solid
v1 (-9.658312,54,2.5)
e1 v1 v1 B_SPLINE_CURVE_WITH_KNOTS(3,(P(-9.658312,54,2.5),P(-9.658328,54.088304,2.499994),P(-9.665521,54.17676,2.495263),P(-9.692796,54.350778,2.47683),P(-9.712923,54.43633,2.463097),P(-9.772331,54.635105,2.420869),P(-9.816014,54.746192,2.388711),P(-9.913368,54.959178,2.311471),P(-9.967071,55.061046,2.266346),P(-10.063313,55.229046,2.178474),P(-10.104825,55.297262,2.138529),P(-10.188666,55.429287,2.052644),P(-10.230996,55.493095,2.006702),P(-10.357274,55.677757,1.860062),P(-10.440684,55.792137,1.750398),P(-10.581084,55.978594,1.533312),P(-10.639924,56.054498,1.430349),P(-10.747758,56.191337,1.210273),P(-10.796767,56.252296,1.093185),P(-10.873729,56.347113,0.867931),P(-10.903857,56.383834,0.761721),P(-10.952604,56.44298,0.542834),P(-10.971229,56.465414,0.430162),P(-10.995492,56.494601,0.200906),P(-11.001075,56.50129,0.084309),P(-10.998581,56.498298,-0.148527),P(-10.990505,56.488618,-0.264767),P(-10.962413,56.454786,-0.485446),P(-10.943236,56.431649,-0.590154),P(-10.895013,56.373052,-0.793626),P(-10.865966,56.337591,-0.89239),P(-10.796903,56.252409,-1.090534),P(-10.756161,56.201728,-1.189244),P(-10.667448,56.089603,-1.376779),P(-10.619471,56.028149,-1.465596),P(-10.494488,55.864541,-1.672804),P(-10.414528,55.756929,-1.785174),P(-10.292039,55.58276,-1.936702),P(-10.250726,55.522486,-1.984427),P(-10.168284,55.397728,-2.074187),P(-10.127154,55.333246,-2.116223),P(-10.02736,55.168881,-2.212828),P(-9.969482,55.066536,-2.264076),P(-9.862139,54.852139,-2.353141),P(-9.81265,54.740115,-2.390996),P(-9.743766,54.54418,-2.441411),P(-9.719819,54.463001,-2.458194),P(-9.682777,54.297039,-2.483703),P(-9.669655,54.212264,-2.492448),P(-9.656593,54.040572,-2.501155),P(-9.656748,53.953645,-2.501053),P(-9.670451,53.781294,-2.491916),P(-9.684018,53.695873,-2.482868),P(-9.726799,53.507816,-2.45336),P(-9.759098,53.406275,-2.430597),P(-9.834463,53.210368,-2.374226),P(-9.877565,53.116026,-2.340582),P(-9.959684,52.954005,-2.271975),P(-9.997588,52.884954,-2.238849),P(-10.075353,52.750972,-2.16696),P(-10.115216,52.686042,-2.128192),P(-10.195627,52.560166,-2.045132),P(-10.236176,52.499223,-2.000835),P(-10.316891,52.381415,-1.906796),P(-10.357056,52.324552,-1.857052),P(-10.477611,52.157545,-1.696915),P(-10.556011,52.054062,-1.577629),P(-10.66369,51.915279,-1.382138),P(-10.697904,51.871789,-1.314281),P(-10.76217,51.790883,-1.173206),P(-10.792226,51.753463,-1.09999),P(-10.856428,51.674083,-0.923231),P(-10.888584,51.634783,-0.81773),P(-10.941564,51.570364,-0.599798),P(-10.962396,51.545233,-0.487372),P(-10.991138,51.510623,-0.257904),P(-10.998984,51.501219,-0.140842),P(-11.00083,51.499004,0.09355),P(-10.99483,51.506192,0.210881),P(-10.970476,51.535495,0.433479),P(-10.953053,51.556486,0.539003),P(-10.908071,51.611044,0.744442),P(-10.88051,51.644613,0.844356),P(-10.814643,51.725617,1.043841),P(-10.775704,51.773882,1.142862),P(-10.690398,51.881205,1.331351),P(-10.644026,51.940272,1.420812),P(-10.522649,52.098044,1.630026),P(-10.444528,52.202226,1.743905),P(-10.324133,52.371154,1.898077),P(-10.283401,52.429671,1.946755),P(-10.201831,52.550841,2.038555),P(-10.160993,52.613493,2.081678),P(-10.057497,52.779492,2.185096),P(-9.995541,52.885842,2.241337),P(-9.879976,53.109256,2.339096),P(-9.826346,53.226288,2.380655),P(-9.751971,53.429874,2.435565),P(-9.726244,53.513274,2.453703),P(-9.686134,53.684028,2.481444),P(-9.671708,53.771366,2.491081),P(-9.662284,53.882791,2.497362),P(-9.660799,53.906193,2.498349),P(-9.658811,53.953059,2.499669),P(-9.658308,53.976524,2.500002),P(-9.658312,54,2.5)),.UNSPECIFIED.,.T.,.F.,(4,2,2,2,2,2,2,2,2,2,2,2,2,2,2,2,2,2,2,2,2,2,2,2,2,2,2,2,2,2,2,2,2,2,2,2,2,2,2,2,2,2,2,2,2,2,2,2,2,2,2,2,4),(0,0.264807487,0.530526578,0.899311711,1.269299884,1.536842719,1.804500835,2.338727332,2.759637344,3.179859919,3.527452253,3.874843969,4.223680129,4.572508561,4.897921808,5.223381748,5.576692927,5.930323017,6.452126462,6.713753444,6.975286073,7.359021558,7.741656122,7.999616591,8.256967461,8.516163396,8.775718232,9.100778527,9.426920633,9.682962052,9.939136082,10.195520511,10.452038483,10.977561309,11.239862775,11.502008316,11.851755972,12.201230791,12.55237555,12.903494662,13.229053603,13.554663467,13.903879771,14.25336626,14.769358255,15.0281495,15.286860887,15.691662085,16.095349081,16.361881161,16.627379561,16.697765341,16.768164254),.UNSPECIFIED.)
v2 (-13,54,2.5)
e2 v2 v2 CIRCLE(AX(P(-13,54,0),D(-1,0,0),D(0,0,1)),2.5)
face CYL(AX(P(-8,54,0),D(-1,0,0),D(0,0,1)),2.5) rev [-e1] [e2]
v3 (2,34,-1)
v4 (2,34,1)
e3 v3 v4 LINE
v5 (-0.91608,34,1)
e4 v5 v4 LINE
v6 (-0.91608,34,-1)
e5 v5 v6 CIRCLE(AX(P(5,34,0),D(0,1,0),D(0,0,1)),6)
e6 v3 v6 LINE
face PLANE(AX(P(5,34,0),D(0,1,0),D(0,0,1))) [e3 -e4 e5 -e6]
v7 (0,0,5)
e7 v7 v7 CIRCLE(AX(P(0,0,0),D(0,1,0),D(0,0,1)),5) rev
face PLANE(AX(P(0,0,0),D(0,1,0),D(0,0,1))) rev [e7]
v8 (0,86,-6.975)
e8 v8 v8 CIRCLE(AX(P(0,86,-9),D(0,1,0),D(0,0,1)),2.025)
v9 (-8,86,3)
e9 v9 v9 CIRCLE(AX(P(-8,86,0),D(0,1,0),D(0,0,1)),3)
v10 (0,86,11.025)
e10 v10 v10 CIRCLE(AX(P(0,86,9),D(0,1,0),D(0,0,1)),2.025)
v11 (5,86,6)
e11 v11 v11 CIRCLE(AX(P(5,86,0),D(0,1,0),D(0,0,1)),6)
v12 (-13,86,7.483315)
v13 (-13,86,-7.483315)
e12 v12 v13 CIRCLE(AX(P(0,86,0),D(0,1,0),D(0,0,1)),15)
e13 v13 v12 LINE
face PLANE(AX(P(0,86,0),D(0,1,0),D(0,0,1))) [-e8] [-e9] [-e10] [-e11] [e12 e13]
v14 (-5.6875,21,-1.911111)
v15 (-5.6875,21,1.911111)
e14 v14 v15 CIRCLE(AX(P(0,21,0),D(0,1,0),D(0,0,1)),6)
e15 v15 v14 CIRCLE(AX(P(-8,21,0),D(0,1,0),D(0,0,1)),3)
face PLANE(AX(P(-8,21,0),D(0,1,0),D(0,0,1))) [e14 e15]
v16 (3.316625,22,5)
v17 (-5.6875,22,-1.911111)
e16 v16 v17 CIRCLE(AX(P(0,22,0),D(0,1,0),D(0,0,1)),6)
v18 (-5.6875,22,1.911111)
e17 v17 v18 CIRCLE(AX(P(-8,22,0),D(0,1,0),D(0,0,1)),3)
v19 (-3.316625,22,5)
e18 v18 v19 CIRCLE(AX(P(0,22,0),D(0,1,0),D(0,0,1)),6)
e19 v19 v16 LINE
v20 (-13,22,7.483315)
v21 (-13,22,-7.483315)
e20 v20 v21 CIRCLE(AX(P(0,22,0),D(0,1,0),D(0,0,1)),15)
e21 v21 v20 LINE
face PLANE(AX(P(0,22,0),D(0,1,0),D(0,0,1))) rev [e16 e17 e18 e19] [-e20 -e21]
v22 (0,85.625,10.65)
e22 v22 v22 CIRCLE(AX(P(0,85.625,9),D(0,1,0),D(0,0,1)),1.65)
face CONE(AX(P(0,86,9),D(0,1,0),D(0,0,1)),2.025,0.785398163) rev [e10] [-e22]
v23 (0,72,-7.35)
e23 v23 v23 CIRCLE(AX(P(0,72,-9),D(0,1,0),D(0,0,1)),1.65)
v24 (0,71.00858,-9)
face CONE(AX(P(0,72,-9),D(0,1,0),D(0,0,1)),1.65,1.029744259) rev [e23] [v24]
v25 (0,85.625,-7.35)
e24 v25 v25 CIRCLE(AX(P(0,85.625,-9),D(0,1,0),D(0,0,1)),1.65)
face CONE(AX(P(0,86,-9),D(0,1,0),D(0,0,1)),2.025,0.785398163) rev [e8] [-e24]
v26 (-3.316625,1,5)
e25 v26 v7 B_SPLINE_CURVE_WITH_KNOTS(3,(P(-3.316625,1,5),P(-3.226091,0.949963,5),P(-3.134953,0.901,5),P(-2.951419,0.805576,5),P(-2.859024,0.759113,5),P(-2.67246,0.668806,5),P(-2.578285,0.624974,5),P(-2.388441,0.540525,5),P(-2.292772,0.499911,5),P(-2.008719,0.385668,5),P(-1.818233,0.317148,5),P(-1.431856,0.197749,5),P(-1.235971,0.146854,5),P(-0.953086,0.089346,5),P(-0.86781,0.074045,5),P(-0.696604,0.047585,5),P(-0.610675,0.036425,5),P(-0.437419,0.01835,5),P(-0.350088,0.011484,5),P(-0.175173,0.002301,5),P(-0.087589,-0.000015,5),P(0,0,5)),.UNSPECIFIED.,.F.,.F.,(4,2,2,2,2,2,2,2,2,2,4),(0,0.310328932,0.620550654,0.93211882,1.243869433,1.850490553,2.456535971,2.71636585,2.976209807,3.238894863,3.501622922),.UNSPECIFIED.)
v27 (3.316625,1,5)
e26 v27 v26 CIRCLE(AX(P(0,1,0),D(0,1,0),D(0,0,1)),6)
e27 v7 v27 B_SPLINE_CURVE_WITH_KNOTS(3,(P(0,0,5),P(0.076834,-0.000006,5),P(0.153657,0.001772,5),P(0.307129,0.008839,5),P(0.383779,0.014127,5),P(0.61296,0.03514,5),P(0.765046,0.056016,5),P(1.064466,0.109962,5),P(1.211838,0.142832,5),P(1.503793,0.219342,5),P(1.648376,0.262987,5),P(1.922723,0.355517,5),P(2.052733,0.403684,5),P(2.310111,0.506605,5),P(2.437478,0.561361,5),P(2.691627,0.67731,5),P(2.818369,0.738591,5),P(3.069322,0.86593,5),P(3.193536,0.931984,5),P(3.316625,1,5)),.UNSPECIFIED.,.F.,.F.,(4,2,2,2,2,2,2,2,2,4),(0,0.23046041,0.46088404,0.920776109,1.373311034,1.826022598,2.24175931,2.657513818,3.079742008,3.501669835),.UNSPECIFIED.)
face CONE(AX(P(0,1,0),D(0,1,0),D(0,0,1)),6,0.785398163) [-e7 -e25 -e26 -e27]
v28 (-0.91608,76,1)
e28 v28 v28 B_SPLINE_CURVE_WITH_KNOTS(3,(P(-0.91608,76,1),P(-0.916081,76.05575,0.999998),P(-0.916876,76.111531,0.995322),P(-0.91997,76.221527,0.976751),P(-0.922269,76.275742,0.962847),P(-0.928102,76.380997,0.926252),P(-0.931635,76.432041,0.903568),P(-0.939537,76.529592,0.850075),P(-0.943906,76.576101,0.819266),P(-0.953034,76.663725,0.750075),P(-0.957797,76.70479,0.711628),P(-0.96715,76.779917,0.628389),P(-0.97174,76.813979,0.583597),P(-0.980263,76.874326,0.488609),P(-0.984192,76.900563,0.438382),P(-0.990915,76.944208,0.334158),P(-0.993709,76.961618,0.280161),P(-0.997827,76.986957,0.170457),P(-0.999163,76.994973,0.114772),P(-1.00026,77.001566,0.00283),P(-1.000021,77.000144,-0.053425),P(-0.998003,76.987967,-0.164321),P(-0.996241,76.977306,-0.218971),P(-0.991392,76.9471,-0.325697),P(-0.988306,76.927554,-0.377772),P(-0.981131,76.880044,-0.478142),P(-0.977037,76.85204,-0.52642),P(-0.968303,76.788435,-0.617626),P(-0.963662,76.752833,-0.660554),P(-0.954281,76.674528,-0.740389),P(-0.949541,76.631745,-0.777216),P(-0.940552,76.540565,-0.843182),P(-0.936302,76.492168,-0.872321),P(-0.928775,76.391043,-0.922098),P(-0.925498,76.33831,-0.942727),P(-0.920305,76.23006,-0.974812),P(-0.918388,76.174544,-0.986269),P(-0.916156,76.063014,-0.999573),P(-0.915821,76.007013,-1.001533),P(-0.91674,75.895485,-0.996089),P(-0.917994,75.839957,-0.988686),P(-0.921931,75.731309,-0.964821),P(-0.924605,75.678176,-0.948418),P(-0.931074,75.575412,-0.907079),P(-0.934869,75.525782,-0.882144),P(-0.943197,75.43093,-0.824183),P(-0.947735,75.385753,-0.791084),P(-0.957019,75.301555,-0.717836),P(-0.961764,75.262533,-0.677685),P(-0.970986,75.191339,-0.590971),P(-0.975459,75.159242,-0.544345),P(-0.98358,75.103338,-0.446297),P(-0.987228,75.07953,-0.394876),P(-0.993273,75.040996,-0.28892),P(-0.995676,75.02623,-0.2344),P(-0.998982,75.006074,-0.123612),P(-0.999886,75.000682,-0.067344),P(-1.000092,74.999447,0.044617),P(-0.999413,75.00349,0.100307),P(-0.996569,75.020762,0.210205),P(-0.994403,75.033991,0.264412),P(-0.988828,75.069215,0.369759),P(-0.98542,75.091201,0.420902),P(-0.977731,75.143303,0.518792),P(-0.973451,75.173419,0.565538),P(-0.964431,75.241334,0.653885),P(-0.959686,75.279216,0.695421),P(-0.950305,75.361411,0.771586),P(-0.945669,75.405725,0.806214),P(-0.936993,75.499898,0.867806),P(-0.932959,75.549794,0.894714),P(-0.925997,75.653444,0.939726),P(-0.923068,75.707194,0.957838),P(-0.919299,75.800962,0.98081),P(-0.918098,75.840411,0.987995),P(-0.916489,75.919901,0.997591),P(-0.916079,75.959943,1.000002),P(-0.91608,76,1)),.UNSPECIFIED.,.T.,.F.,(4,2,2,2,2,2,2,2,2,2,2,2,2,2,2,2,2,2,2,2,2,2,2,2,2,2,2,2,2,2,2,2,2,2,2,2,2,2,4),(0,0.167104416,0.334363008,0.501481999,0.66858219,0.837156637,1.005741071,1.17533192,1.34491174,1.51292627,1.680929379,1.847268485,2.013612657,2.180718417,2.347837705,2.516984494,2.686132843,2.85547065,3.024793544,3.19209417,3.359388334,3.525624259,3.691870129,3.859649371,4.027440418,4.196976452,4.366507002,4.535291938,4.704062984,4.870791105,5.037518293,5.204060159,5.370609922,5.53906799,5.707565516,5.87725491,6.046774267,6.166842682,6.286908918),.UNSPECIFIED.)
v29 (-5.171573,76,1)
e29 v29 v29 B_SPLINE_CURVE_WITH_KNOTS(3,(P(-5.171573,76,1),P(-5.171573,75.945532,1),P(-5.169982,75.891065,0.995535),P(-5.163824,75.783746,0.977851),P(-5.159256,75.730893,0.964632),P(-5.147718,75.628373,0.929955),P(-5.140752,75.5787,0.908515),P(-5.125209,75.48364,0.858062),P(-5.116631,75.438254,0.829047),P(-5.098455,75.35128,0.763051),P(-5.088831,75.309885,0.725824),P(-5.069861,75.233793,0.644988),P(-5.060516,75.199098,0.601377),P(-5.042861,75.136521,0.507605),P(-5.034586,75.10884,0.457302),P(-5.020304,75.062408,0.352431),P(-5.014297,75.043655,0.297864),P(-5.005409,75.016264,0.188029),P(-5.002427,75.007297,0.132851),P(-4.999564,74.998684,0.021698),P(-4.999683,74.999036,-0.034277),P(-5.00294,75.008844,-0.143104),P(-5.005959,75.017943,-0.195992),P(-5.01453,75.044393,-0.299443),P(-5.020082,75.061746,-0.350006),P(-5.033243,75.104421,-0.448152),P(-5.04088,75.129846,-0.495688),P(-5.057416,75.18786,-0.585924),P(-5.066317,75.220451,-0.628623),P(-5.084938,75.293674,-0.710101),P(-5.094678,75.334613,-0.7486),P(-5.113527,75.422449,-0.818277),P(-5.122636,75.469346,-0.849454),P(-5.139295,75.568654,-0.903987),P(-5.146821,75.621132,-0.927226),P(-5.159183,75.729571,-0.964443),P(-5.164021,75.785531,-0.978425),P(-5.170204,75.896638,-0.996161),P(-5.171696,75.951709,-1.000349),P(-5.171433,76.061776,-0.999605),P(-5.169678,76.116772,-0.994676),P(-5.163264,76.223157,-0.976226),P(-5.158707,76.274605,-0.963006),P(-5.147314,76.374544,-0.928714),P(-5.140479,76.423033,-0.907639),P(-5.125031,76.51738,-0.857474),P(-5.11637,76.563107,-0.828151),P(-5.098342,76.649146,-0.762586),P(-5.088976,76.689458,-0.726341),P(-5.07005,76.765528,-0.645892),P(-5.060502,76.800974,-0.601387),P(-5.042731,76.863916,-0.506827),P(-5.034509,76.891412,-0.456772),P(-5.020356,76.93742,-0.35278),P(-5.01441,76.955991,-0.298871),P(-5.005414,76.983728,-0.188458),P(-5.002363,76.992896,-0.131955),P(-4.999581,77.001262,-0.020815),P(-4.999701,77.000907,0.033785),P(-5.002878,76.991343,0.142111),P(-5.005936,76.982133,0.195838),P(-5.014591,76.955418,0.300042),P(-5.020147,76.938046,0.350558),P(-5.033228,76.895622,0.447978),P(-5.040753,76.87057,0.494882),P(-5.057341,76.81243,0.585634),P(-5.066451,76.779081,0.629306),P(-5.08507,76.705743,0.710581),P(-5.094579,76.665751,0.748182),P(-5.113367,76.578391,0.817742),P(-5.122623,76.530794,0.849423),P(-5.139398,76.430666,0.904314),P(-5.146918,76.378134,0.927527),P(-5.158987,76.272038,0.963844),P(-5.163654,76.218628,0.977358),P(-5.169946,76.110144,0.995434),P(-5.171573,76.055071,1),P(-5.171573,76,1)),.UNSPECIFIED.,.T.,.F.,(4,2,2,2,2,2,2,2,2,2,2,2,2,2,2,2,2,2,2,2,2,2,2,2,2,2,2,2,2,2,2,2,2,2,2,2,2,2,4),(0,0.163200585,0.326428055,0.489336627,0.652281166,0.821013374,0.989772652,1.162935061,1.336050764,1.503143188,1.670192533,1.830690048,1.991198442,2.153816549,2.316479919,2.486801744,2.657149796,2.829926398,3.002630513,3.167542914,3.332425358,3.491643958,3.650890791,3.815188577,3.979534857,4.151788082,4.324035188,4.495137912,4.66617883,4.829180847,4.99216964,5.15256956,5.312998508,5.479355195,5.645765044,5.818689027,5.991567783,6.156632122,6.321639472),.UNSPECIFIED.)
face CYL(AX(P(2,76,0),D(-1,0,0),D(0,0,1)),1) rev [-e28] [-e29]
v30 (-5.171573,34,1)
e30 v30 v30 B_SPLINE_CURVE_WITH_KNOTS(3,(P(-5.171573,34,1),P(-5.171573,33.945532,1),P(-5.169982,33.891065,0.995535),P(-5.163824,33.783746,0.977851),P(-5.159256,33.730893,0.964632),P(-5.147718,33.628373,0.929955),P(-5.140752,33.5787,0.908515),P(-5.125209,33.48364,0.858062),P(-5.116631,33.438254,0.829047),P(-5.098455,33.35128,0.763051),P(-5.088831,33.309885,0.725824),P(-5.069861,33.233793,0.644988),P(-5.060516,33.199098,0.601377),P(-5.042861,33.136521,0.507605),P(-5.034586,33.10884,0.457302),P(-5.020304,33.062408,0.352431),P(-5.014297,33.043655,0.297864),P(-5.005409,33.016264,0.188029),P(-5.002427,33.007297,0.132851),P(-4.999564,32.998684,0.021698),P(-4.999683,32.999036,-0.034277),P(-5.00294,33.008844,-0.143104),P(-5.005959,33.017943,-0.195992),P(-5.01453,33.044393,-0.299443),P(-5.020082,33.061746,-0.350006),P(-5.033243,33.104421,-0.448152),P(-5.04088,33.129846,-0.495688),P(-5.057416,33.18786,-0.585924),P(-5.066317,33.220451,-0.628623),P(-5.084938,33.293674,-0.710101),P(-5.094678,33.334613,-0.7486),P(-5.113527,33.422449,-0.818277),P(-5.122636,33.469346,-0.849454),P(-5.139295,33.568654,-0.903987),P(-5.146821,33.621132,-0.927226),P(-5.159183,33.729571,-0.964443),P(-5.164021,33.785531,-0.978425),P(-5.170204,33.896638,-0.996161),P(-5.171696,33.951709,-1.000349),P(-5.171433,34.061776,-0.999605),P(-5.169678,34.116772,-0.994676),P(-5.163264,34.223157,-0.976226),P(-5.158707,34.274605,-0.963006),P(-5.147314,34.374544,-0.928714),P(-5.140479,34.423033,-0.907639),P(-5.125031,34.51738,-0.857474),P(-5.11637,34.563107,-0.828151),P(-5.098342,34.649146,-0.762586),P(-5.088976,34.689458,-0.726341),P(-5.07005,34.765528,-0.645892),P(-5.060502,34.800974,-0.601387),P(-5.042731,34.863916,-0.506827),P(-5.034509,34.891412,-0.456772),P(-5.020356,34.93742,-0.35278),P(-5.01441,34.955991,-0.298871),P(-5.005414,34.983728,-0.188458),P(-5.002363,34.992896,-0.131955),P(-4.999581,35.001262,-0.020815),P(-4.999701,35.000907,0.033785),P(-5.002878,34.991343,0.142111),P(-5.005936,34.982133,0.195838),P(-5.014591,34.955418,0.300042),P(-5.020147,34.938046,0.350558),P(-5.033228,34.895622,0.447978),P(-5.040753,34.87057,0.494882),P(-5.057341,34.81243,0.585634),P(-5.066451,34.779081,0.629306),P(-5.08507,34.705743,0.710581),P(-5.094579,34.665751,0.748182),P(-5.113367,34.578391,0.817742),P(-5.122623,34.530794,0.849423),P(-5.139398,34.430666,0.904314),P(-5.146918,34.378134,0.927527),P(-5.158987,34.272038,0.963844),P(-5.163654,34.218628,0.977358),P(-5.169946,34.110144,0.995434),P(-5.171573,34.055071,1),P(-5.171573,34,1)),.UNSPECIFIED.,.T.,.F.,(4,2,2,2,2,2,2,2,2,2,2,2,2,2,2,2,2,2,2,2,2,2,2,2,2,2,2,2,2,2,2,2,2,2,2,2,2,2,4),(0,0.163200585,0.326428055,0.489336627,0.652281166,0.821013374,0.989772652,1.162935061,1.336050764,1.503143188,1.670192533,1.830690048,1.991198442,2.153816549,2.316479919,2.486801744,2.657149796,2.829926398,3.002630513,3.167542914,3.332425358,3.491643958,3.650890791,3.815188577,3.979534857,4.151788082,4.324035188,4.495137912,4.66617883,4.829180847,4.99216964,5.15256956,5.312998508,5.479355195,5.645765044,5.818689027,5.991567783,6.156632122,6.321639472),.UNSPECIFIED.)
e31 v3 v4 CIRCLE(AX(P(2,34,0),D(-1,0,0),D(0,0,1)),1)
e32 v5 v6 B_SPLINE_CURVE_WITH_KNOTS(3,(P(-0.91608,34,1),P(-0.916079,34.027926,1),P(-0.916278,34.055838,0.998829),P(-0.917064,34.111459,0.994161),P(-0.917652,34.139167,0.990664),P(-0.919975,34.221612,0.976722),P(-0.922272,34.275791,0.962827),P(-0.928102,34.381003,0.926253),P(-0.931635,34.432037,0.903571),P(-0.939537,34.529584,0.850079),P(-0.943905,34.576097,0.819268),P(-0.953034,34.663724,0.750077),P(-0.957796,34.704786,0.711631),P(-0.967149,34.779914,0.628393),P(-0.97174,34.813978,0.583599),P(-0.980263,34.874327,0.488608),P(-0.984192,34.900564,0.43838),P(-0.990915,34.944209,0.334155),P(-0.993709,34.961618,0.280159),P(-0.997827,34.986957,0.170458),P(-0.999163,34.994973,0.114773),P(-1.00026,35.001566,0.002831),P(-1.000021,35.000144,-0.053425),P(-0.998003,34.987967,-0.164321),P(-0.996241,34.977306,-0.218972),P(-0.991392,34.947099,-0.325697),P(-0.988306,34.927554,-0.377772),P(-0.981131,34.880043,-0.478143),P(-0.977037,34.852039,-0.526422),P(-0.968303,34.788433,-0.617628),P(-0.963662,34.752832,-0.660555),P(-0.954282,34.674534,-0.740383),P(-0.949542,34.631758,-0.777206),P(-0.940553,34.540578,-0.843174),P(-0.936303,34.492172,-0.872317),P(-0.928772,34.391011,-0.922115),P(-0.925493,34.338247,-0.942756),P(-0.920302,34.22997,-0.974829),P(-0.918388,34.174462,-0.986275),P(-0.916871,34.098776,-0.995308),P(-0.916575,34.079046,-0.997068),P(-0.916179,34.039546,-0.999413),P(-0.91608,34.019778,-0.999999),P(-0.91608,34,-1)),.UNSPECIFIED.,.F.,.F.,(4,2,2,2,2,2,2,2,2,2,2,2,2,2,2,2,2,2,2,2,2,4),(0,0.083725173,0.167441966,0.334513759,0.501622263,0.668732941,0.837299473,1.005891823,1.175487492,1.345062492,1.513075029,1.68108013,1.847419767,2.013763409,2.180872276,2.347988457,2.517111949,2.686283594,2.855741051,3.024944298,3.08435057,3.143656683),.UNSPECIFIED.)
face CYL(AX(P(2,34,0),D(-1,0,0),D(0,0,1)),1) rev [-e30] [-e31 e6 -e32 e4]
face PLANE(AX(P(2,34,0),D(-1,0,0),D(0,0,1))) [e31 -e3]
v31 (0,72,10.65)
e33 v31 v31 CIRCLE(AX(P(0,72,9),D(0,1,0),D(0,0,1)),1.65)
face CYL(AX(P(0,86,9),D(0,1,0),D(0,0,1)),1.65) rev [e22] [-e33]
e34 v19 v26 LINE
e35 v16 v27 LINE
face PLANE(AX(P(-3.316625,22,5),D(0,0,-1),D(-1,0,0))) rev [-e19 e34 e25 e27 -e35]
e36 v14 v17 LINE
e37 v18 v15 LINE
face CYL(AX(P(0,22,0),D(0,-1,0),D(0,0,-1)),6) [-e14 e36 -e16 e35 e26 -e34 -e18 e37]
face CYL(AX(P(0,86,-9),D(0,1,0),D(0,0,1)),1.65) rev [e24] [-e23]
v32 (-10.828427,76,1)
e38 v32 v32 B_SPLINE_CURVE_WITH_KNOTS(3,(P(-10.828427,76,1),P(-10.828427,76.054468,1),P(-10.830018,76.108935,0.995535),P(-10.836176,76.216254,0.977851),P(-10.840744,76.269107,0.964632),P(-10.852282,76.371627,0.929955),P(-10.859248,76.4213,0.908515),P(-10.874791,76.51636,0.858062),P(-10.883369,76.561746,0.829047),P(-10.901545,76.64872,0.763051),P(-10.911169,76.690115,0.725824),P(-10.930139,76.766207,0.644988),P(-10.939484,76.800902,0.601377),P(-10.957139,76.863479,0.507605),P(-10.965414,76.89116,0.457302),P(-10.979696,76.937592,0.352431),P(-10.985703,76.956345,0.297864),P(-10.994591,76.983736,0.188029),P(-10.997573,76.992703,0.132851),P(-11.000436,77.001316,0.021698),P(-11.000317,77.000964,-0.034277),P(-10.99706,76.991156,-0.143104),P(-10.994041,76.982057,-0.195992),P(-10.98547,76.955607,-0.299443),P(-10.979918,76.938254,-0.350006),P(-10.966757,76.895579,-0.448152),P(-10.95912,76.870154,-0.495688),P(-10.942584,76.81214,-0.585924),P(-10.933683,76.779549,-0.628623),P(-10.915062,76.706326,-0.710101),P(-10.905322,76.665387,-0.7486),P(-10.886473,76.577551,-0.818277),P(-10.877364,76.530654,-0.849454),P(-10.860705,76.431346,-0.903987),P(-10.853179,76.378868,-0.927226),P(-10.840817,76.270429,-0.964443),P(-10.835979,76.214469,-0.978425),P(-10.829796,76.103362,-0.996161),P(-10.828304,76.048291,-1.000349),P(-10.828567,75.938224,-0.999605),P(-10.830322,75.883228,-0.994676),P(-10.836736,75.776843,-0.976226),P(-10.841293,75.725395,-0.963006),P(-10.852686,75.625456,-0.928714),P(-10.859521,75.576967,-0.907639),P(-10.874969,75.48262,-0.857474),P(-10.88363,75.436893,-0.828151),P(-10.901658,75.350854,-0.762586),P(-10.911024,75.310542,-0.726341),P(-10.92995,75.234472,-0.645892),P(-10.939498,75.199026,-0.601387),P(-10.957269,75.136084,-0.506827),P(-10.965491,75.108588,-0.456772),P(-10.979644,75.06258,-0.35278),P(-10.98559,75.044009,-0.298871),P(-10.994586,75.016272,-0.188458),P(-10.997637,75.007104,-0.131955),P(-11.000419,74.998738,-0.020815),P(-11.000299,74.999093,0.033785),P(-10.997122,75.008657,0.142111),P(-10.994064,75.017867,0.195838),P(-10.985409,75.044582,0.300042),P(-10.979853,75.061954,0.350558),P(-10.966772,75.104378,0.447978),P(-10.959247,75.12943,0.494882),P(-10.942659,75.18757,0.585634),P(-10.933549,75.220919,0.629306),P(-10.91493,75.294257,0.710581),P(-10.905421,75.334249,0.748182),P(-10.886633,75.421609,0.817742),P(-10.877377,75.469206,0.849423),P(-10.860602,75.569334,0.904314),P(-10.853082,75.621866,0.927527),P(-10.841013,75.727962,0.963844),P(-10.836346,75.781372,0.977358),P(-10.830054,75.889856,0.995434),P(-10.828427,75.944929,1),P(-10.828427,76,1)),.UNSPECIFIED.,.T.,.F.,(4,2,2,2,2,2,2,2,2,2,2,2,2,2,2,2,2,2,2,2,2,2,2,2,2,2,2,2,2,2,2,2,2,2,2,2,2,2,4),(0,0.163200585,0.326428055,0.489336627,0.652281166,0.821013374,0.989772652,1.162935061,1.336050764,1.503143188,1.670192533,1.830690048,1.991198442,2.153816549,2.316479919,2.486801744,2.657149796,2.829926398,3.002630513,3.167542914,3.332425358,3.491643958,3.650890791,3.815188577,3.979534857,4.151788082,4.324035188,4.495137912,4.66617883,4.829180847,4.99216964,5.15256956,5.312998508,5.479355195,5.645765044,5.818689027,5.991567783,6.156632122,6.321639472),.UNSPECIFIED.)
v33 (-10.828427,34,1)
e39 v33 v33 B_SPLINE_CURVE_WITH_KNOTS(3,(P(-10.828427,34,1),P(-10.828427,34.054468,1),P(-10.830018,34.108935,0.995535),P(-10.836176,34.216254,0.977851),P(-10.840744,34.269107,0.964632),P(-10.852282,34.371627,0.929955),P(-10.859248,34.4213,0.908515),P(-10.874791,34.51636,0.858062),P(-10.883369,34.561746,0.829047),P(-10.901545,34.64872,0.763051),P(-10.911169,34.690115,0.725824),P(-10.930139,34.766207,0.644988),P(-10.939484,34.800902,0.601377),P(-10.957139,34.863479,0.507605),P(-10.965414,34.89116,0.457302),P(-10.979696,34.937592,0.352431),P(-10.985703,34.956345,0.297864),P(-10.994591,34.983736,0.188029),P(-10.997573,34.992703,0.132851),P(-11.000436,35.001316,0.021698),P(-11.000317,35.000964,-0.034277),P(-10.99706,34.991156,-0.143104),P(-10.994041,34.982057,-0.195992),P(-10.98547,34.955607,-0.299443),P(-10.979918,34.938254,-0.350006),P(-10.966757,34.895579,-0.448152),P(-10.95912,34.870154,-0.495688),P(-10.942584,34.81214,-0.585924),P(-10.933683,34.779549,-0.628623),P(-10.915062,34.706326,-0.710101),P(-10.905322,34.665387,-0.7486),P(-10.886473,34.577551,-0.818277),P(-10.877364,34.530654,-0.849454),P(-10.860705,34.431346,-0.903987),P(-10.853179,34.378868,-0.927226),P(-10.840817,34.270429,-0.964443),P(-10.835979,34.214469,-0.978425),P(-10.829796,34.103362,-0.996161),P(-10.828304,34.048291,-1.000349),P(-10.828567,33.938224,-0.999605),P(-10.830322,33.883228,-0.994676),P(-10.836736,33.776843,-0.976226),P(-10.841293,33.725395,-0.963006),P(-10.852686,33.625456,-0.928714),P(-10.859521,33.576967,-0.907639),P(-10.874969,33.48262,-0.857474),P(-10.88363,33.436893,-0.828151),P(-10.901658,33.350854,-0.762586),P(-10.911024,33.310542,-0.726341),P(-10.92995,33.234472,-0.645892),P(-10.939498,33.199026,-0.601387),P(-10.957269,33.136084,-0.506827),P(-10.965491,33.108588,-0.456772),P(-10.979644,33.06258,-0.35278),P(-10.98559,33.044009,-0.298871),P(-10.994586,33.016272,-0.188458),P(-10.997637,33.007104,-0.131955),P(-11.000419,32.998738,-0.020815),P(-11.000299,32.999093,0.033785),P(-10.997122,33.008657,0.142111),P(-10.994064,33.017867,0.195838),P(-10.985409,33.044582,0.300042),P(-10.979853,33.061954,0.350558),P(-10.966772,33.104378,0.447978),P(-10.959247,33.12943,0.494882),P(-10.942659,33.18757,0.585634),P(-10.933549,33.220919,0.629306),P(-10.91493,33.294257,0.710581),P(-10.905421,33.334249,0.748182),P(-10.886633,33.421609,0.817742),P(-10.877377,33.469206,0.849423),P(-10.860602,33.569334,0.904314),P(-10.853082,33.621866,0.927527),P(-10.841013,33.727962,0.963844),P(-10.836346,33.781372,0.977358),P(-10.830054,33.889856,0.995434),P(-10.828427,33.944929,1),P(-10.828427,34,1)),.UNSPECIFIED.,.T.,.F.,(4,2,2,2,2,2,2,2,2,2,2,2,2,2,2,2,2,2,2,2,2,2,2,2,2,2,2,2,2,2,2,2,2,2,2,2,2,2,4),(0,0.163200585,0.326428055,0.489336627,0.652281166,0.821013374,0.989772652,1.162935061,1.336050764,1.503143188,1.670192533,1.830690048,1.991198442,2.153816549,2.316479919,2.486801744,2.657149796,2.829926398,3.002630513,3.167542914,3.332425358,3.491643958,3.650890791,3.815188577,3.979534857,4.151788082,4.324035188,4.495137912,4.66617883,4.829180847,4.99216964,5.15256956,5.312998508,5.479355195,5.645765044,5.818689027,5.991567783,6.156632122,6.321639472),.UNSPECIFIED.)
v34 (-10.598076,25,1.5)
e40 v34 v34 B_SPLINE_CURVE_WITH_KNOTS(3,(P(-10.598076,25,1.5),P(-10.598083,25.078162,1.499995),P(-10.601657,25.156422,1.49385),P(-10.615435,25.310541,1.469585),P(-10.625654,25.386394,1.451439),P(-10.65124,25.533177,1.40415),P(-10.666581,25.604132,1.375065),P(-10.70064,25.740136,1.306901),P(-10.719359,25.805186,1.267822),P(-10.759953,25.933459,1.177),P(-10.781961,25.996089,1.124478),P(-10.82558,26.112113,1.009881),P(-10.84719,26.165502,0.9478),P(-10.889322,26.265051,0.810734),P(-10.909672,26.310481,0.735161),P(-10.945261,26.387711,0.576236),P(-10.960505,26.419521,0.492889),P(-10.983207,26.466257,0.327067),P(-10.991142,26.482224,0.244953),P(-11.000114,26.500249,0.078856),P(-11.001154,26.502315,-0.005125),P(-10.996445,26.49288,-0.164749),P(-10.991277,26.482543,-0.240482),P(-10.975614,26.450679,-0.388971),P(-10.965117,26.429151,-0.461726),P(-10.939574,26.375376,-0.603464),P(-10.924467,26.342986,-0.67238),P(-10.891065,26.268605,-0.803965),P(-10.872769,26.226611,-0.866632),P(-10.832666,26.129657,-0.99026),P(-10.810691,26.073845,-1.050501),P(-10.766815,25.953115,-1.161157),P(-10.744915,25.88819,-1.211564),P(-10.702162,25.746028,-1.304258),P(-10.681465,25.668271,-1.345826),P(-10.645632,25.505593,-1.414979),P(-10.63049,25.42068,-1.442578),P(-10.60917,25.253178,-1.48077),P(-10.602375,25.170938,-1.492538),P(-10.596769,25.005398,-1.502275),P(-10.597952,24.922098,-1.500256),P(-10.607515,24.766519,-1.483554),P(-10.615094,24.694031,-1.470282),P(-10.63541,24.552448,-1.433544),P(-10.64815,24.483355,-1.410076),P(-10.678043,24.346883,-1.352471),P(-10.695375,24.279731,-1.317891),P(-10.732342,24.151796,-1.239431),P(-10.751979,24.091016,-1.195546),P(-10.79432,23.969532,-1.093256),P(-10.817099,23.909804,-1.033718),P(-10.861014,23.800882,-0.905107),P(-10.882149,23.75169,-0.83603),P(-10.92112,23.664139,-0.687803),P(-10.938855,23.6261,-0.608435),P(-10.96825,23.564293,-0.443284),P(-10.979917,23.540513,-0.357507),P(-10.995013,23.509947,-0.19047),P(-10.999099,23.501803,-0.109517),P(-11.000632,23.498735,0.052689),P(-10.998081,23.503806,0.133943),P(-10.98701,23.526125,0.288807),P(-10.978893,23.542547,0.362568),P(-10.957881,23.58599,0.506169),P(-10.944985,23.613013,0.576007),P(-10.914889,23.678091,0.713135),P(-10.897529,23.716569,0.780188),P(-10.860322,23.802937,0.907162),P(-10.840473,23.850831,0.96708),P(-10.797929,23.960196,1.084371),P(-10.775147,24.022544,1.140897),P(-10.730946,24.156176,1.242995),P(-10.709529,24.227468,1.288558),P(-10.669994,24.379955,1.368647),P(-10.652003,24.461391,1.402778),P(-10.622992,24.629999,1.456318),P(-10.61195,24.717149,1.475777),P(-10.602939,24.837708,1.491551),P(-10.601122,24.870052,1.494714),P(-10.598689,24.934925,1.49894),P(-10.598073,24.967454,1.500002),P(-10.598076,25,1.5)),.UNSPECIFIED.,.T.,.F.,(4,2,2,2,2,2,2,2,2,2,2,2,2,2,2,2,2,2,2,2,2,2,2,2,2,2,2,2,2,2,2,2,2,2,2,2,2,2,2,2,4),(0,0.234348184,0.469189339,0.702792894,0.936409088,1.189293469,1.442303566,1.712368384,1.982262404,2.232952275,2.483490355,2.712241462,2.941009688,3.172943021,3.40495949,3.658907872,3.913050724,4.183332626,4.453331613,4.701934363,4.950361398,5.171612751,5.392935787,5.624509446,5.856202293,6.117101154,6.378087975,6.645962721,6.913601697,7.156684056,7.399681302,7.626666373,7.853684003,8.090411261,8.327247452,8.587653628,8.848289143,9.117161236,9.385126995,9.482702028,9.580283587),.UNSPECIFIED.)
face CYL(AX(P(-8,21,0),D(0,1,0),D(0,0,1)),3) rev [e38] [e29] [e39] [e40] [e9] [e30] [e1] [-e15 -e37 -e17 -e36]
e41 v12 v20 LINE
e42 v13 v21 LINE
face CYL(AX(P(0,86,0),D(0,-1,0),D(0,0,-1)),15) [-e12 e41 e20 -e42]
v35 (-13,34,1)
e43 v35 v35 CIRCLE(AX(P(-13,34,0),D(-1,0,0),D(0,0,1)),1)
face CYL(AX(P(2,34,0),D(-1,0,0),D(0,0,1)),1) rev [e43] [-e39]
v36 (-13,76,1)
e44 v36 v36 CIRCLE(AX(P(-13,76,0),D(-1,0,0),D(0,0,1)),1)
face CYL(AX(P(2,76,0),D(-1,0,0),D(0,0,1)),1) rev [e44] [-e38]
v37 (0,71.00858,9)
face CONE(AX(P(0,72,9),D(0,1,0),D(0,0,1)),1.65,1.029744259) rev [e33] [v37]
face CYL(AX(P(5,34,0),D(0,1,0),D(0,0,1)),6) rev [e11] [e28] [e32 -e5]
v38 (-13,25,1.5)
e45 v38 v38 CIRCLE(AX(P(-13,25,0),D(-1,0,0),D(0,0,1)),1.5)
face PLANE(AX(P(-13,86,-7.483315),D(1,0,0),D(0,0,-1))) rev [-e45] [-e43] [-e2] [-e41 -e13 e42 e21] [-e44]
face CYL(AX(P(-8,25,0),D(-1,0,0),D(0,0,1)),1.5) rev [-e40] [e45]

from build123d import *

# Parameters (mm, degrees)
BOSS_EXTRUDE1_DEPTH         = 22
BOSS_EXTRUDE2_DEPTH         = 64
SKETCH3_R                   = 3
CUT_EXTRUDE1_DEPTH          = 65
SKETCH4_R                   = 6
CUT_EXTRUDE2_DEPTH          = 52
M4_TAPPED_HOLE1_D           = 3.3
M4_TAPPED_HOLE1_DEPTH       = 14
M4_TAPPED_HOLE1_CSINK_D     = 4.05
M4_TAPPED_HOLE1_CSINK_ANGLE = 90
M4_TAPPED_HOLE1_TIP         = 0.991420021
SKETCH7_R                   = 2.5
SKETCH7_R_2                 = 1.5
CUT_EXTRUDE3_DEPTH          = 5
SKETCH8_R                   = 1
CUT_EXTRUDE4_DEPTH          = 15
CHAMFER1_SIZE               = 1


with BuildPart() as part:
    # Sketch1 → Boss-Extrude1 (new body)
    with BuildSketch(Plane(origin=(0, 0, 0), x_dir=(1, 0, 0), z_dir=(0, 1, 0))):
        with BuildLine():
            Line((-3.31662479, -5), (3.31662479, -5))
            ThreePointArc((3.31662479, -5), (0, 6), (-3.31662479, -5))
        make_face()
    extrude(amount=BOSS_EXTRUDE1_DEPTH)

    # Sketch2 → Boss-Extrude2 (add)
    with BuildSketch(Plane(origin=(0, 22, 0), x_dir=(1, 0, 0), z_dir=(0, 1, 0))):
        with BuildLine():
            Line((-13, 7.483314774), (-13, -7.483314774))
            ThreePointArc((-13, -7.483314774), (15, 0), (-13, 7.483314774))
        make_face()
    extrude(amount=BOSS_EXTRUDE2_DEPTH)

    # Sketch3 → Cut-Extrude1 (cut)
    with BuildSketch(Plane(origin=(0, 86, 0), x_dir=(1, 0, 0), z_dir=(0, 1, 0))):
        with Locations(Location((-8, 0, 0), (0, 0, 270))):
            Circle(SKETCH3_R)
    extrude(amount=-CUT_EXTRUDE1_DEPTH, mode=Mode.SUBTRACT)

    # Sketch4 → Cut-Extrude2 (cut)
    with BuildSketch(Plane(origin=(0, 86, 0), x_dir=(1, 0, 0), z_dir=(0, 1, 0))):
        with Locations(Location((5, 0, 0), (0, 0, 270))):
            Circle(SKETCH4_R)
    extrude(amount=-CUT_EXTRUDE2_DEPTH, mode=Mode.SUBTRACT)

    # M4 Tapped Hole1
    with Locations(Plane(origin=(0, 86, 0), x_dir=(1, 0, 0), z_dir=(0, 1, 0))):
        with Locations((0, 9), (0, -9)):
            CounterSinkHole(M4_TAPPED_HOLE1_D / 2, M4_TAPPED_HOLE1_CSINK_D / 2, depth=M4_TAPPED_HOLE1_DEPTH, counter_sink_angle=M4_TAPPED_HOLE1_CSINK_ANGLE)
            with Locations((0, 0, -(M4_TAPPED_HOLE1_DEPTH + M4_TAPPED_HOLE1_TIP / 2))):  # 118° drill point
                Cone(0, M4_TAPPED_HOLE1_D / 2, M4_TAPPED_HOLE1_TIP, mode=Mode.SUBTRACT)

    # Sketch7 → Cut-Extrude3 (cut)
    with BuildSketch(Plane.ZY.offset(13)):
        with Locations((0, 54)):
            Circle(SKETCH7_R)
        with Locations((0, 25)):
            Circle(SKETCH7_R_2)
    extrude(amount=-CUT_EXTRUDE3_DEPTH, mode=Mode.SUBTRACT)

    # Sketch8 → Cut-Extrude4 (cut)
    with BuildSketch(Plane.ZY.offset(13)):
        with Locations((0, 76)):
            Circle(SKETCH8_R)
        with Locations((0, 34)):
            Circle(SKETCH8_R)
    extrude(amount=-CUT_EXTRUDE4_DEPTH, mode=Mode.SUBTRACT)

    # Chamfer1
    chamfer1_edges = [part.edges().sort_by_distance(p)[0] for p in [
        (0, 0, -6),
    ]]
    chamfer(chamfer1_edges, length=CHAMFER1_SIZE - 0.0001)  # a hair under: the kernel refuses the full size


solid = part.part
